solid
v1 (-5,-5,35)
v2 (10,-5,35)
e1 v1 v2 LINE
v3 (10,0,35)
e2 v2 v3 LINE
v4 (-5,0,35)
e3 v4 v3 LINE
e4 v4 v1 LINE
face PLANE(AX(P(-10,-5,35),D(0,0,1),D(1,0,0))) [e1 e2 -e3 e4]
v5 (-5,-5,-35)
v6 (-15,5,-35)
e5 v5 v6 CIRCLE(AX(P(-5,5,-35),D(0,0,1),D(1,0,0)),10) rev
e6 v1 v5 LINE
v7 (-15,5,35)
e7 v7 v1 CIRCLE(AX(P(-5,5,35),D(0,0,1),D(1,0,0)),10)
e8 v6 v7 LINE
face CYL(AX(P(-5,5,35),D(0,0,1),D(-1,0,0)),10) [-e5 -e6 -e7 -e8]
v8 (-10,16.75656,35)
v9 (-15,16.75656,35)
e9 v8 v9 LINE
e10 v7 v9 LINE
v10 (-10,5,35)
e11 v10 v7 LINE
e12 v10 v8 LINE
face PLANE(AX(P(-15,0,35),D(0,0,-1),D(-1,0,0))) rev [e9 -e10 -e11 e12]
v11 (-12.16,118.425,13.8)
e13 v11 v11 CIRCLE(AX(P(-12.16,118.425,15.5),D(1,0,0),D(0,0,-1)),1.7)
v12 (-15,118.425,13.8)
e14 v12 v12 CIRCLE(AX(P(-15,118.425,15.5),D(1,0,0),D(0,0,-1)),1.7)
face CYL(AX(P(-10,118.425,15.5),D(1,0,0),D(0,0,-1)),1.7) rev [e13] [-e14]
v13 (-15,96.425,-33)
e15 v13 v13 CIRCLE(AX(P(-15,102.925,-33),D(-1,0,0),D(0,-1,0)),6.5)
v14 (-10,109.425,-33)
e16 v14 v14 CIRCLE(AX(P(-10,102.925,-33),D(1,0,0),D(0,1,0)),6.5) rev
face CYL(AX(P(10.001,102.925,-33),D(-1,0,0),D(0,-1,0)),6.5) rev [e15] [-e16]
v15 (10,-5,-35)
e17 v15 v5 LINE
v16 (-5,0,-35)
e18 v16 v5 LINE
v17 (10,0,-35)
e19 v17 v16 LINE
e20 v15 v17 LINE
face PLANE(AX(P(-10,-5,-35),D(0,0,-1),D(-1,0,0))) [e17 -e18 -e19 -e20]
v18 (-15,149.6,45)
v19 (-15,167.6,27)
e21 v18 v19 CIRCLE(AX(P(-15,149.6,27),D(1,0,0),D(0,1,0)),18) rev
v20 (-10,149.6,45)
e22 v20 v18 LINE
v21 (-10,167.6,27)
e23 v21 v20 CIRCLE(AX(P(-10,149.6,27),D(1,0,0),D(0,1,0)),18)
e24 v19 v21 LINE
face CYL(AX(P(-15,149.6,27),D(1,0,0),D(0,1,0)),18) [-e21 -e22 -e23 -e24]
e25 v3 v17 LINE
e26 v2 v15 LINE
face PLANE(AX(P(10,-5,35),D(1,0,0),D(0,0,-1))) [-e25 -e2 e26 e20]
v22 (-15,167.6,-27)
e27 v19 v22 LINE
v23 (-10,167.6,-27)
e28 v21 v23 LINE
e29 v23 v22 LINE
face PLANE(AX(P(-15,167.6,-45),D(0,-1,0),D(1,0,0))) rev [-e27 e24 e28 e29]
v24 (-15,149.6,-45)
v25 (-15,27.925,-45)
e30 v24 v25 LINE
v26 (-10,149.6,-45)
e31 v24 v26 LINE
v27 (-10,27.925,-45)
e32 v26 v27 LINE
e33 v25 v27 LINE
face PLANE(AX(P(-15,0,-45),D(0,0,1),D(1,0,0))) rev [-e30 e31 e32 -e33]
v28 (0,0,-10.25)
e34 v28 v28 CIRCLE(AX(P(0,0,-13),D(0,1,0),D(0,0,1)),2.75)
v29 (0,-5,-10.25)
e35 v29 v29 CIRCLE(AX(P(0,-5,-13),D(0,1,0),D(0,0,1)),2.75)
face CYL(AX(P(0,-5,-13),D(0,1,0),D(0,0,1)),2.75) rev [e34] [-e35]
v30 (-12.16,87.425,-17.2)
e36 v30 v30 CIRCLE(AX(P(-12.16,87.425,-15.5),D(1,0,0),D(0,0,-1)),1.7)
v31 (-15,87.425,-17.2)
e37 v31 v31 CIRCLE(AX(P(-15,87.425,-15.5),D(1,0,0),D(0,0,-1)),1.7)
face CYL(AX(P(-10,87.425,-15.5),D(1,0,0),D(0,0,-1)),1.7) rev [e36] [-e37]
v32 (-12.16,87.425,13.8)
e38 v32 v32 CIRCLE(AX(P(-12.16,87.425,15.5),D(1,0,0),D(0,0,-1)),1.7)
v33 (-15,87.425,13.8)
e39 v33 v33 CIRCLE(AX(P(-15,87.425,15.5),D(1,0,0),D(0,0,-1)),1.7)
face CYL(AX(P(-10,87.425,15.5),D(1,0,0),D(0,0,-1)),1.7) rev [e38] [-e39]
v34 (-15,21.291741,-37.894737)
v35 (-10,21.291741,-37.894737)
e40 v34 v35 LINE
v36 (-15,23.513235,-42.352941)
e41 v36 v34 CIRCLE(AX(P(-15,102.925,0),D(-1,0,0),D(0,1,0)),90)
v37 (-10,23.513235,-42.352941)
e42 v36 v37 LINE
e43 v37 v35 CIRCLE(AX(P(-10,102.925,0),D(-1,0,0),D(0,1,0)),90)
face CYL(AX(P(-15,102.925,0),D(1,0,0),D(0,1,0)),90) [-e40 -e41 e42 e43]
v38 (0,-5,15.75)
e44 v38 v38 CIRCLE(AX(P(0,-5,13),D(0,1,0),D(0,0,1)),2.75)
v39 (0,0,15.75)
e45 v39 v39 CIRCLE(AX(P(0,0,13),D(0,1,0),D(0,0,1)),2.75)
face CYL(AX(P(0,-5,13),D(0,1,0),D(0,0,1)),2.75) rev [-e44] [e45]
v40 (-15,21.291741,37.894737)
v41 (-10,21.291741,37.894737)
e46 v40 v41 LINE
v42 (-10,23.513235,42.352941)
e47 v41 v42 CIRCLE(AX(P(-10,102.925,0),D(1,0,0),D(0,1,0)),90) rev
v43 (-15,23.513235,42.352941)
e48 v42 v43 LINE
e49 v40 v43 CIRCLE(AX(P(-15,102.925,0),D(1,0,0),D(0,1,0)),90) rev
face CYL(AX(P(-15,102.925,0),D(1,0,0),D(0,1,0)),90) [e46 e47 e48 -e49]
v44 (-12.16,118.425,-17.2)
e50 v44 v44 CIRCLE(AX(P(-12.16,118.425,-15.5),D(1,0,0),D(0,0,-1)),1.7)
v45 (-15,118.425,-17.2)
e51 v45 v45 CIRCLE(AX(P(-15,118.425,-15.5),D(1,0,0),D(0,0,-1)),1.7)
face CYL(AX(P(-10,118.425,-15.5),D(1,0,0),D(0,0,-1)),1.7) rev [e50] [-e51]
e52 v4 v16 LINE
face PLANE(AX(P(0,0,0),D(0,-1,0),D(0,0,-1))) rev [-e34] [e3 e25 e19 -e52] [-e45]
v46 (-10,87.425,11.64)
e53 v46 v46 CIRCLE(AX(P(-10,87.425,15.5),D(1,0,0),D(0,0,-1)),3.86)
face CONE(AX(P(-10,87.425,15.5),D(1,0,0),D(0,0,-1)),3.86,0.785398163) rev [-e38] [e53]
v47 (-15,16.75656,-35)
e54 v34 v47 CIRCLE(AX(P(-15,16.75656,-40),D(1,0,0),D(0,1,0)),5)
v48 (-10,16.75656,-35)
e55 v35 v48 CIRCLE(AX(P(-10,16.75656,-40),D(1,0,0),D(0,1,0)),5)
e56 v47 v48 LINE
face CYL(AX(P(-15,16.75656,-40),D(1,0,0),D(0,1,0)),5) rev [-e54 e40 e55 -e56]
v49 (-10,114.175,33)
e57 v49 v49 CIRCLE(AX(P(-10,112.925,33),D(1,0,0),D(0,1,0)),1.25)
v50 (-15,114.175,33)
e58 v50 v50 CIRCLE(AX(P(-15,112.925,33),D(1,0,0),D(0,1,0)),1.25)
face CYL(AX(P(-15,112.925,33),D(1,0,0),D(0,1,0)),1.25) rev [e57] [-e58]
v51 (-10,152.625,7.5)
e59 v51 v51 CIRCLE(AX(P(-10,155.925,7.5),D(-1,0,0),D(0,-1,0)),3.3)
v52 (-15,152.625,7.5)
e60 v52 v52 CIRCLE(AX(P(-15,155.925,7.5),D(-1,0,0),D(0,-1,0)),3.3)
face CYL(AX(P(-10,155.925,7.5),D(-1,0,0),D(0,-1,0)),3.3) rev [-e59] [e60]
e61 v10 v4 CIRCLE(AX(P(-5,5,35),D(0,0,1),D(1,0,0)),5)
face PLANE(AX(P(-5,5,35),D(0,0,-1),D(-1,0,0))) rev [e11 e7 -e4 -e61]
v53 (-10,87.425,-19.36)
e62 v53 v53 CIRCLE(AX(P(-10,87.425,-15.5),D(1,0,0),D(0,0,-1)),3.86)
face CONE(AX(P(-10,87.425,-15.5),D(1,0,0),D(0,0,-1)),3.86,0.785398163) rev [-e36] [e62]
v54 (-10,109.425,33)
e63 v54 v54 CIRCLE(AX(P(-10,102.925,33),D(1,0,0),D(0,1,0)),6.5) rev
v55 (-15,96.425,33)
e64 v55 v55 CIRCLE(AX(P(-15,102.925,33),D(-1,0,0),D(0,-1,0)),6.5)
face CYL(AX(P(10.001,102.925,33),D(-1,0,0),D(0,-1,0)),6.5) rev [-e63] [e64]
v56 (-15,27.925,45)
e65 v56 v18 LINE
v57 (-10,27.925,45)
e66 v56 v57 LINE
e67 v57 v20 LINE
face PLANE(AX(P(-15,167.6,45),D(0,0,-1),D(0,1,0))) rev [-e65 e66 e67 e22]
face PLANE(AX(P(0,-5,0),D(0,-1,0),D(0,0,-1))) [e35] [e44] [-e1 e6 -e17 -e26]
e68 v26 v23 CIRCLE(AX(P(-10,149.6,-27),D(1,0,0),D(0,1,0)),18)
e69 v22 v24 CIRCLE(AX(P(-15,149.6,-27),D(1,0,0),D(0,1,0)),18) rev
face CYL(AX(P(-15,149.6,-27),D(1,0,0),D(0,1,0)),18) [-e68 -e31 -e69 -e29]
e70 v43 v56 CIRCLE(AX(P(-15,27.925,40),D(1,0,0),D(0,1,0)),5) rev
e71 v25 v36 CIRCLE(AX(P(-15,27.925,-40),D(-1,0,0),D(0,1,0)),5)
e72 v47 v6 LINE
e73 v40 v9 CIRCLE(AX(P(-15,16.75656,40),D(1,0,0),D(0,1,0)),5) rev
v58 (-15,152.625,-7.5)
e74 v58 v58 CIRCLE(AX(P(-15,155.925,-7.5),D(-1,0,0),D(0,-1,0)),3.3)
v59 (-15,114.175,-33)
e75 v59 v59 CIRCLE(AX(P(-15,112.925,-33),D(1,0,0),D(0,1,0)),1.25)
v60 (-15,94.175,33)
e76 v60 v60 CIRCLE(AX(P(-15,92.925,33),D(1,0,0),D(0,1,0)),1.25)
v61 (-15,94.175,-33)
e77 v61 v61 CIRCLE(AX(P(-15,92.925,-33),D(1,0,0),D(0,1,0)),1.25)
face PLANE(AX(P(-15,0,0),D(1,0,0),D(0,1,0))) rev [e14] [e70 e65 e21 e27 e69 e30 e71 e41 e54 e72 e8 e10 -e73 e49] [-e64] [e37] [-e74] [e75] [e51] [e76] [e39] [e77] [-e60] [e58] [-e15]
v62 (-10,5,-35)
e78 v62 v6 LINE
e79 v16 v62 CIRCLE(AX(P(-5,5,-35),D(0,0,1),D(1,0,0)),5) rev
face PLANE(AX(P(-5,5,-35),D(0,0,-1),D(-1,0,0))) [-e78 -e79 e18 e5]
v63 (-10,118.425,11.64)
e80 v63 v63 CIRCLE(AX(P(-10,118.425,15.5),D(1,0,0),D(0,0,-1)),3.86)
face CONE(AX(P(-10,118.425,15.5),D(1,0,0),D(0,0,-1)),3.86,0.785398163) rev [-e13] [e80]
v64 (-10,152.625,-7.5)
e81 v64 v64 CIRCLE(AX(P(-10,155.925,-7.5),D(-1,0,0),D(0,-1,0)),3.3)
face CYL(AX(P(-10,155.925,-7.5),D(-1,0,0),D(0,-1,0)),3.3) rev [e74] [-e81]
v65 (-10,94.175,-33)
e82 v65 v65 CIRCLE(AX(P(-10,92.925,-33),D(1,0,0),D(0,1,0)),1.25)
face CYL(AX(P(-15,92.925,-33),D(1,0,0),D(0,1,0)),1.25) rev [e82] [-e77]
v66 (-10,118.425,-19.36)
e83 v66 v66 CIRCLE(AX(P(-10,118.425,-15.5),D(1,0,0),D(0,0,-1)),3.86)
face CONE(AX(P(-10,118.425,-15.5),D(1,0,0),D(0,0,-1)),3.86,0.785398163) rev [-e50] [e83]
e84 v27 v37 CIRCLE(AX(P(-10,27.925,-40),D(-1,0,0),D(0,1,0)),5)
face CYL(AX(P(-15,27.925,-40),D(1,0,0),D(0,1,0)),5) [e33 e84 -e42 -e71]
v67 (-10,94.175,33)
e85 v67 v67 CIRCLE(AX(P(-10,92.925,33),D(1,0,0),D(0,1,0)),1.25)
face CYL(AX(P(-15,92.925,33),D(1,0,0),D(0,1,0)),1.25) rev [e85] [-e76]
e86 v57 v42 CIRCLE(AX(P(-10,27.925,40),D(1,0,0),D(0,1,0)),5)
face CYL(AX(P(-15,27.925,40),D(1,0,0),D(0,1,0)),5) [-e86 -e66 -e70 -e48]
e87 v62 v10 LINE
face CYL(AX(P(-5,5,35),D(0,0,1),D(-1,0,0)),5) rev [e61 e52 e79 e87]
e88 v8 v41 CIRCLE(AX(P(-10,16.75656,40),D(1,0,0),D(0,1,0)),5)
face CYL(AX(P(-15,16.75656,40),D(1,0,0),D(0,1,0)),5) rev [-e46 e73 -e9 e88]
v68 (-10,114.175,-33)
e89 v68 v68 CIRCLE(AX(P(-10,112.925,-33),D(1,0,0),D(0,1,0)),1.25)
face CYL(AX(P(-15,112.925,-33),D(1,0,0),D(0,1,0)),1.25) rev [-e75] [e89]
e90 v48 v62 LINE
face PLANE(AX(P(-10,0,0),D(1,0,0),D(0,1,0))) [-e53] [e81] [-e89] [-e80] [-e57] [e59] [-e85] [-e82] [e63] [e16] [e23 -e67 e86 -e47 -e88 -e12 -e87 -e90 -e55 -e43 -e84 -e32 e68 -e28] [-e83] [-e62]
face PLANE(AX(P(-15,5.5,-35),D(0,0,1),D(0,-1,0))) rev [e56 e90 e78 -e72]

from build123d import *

# Parameters (mm, degrees)
ESBO_O1_W                                           = 20
ESBO_O1_H                                           = 70
FLANGE_BASE1_DEPTH                                  = 5
ARESTA_FLANGE1_STRIP_W                              = 30
ARESTA_FLANGE1_STRIP_H                              = 5
ARESTA_FLANGE1_STRIP_CUT_DEPTH                      = 70
ARESTA_FLANGE1_DEPTH                                = 70
ARESTA_FLANGE1_START                                = 5
ARESTA_FLANGE1_PROFILE_W                            = 90
ARESTA_FLANGE1_PROFILE_H                            = 162.6
ARESTA_FLANGE1_FLAT_DEPTH                           = 5
CORTE_EXTRUS_O1_DEPTH                               = 5
CORTE_EXTRUS_O2_DEPTH                               = 5
FILETE1_R                                           = 5
FILETE2_R                                           = 5
CORTE_EXTRUS_O3_REACH                               = 177.328
ESBO_O14_R                                          = 6.5
FILETE3_R                                           = 18
FILETE4_R                                           = 18
ESBO_O27_R                                          = 3.3
CORTE_EXTRUS_O4_DEPTH                               = 5
ESBO_O28_R                                          = 2.75
CORTE_EXTRUS_O5_DEPTH                               = 5
ESCAREADO_PARA_PARAFUSO_ALLEN_SEXTAVADO_D           = 3.4
ESCAREADO_PARA_PARAFUSO_ALLEN_SEXTAVADO_CSINK_D     = 7.72
ESCAREADO_PARA_PARAFUSO_ALLEN_SEXTAVADO_CSINK_ANGLE = 90
ESBO_O34_R                                          = 1.25
CORTE_EXTRUS_O6_DEPTH                               = 5


# Sheet-metal steps are written as plain solids
with BuildPart() as part:
    # Esboço1 → Flange-base1 (new body)
    with BuildSketch(Plane(origin=(0, 0, 0), x_dir=(1, 0, 0), z_dir=(0, 1, 0))):
        Rectangle(ESBO_O1_W, ESBO_O1_H)
    extrude(amount=-FLANGE_BASE1_DEPTH)

    # Aresta-Flange1 strip (across the edge) → Aresta-Flange1 strip cut (cut)
    with BuildSketch(Plane(origin=(-10, 0, -35), x_dir=(1, 0, 0), z_dir=(0, 0, 1))):
        with Locations((-10, -2.5)):
            Rectangle(ARESTA_FLANGE1_STRIP_W, ARESTA_FLANGE1_STRIP_H)
    extrude(amount=ARESTA_FLANGE1_STRIP_CUT_DEPTH, mode=Mode.SUBTRACT)

    # Aresta-Flange1 bend section (across the edge) → Aresta-Flange1 (add)
    with BuildSketch(Plane(origin=(-10, 0, -35), x_dir=(1, 0, 0), z_dir=(0, 0, 1))):
        with BuildLine():
            Line((-5, 5), (0, 5))
            ThreePointArc((0, 5), (1.464466094, 1.464466094), (5, 0))
            Line((5, 0), (5, -5))
            ThreePointArc((5, -5), (-2.071067812, -2.071067812), (-5, 5))
        make_face()
    extrude(amount=ARESTA_FLANGE1_DEPTH)

    # Aresta-Flange1 profile (on flange) → Aresta-Flange1 flat (add)
    with BuildSketch(Plane.ZY.offset(10).offset(ARESTA_FLANGE1_START)):
        with Locations((0, 86.3)):
            Rectangle(ARESTA_FLANGE1_PROFILE_W, ARESTA_FLANGE1_PROFILE_H)
    extrude(amount=-ARESTA_FLANGE1_FLAT_DEPTH)

    # Esboço11 → Corte-extrusão1 (cut)
    with BuildSketch(Plane(origin=(-10, 0, 0), x_dir=(0, 0, -1), z_dir=(1, 0, 0))):
        with BuildLine():
            Line((35, 5.5), (35, 16.756560302))
            ThreePointArc((35, 16.756560302), (35.785363848, 19.446698236), (37.894736842, 21.291741339))
            ThreePointArc((37.894736842, 21.291741339), (40.139210452, 22.371640143), (42.352941176, 23.513235294))
            ThreePointArc((42.352941176, 23.513235294), (44.287464629, 25.352521223), (45, 27.925))
            Line((45, 27.925), (45, 5))
            Line((45, 5), (35, 5))
            Line((35, 5), (35, 5.5))
        make_face()
    extrude(amount=-CORTE_EXTRUS_O1_DEPTH, mode=Mode.SUBTRACT)

    # Esboço12 → Corte-extrusão2 (cut)
    with BuildSketch(Plane(origin=(-10, 0, 0), x_dir=(0, 0, -1), z_dir=(1, 0, 0))):
        with BuildLine():
            Line((-45, 5), (-35, 5))
            Line((-35, 5), (-35, 20.009380241))
            ThreePointArc((-35, 20.009380241), (-40.077219356, 22.340780151), (-45, 24.982713659))
            Line((-45, 24.982713659), (-45, 5))
        make_face()
    extrude(amount=-CORTE_EXTRUS_O2_DEPTH, mode=Mode.SUBTRACT)

    # Filete1
    filete1_edges = [part.edges().sort_by_distance(p)[0] for p in [
        (-12.5, 20.009380241, 35),
    ]]
    fillet(filete1_edges, radius=FILETE1_R)

    # Filete2
    filete2_edges = [part.edges().sort_by_distance(p)[0] for p in [
        (-12.5, 24.982713659, 45),
    ]]
    fillet(filete2_edges, radius=FILETE2_R)

    # Esboço14 → Corte-extrusão3 (cut, up to next)
    with BuildSketch(Plane.ZY.offset(15), mode=Mode.PRIVATE) as corte_extrus_o3_sk1:
        with Locations(Location((-33, 102.925, 0), (0, 0, 270))):
            Circle(ESBO_O14_R)
    corte_extrus_o3_tool1 = extrude(corte_extrus_o3_sk1.sketch, amount=-CORTE_EXTRUS_O3_REACH, mode=Mode.PRIVATE) & part.part
    # Esboço14 → Corte-extrusão3 (cut, up to next)
    with BuildSketch(Plane.ZY.offset(15), mode=Mode.PRIVATE) as corte_extrus_o3_sk2:
        with Locations(Location((33, 102.925, 0), (0, 0, 270))):
            Circle(ESBO_O14_R)
    corte_extrus_o3_tool2 = extrude(corte_extrus_o3_sk2.sketch, amount=-CORTE_EXTRUS_O3_REACH, mode=Mode.PRIVATE) & part.part
    add(corte_extrus_o3_tool1.solids().sort_by_distance((-15, 102.925, -33))[0], mode=Mode.SUBTRACT)
    add(corte_extrus_o3_tool2.solids().sort_by_distance((-15, 102.925, 33))[0], mode=Mode.SUBTRACT)

    # Filete3
    filete3_edges = [part.edges().sort_by_distance(p)[0] for p in [
        (-12.5, 167.6, 45),
    ]]
    fillet(filete3_edges, radius=FILETE3_R)

    # Filete4
    filete4_edges = [part.edges().sort_by_distance(p)[0] for p in [
        (-12.5, 167.6, -45),
    ]]
    fillet(filete4_edges, radius=FILETE4_R)

    # Esboço27 → Corte-extrusão4 (cut)
    with BuildSketch(Plane.ZY.offset(15)):
        with Locations(Location((7.5, 155.925, 0), (0, 0, 270))):
            Circle(ESBO_O27_R)
        with Locations(Location((-7.5, 155.925, 0), (0, 0, 270))):
            Circle(ESBO_O27_R)
    extrude(amount=-CORTE_EXTRUS_O4_DEPTH, mode=Mode.SUBTRACT)

    # Esboço28 → Corte-extrusão5 (cut)
    with BuildSketch(Plane(origin=(0, 0, 0), x_dir=(1, 0, 0), z_dir=(0, 1, 0))):
        with Locations(Location((0, 13, 0), (0, 0, 270))):
            Circle(ESBO_O28_R)
        with Locations(Location((0, -13, 0), (0, 0, 270))):
            Circle(ESBO_O28_R)
    extrude(amount=-CORTE_EXTRUS_O5_DEPTH, mode=Mode.SUBTRACT)

    # Escareado para parafuso Allen sextavado escareado de M32 (through all)
    with Locations(Plane(origin=(-10, 0, 0), x_dir=(0, 0, -1), z_dir=(1, 0, 0))):
        with Locations((-15.5, 87.425), (-15.5, 118.425), (15.5, 118.425), (15.5, 87.425)):
            CounterSinkHole(ESCAREADO_PARA_PARAFUSO_ALLEN_SEXTAVADO_D / 2, ESCAREADO_PARA_PARAFUSO_ALLEN_SEXTAVADO_CSINK_D / 2, counter_sink_angle=ESCAREADO_PARA_PARAFUSO_ALLEN_SEXTAVADO_CSINK_ANGLE)

    # Esboço34 → Corte-extrusão6 (cut)
    with BuildSketch(Plane(origin=(-10, 0, 0), x_dir=(0, 0, -1), z_dir=(1, 0, 0))):
        with Locations(Location((-33, 112.924999999, 0), (0, 0, 90))):
            Circle(ESBO_O34_R)
        with Locations(Location((-33, 92.924999999, 0), (0, 0, 90))):
            Circle(ESBO_O34_R)
        with Locations(Location((33, 112.924999999, 0), (0, 0, 90))):
            Circle(ESBO_O34_R)
        with Locations(Location((33, 92.924999999, 0), (0, 0, 90))):
            Circle(ESBO_O34_R)
    extrude(amount=-CORTE_EXTRUS_O6_DEPTH, mode=Mode.SUBTRACT)


solid = part.part
